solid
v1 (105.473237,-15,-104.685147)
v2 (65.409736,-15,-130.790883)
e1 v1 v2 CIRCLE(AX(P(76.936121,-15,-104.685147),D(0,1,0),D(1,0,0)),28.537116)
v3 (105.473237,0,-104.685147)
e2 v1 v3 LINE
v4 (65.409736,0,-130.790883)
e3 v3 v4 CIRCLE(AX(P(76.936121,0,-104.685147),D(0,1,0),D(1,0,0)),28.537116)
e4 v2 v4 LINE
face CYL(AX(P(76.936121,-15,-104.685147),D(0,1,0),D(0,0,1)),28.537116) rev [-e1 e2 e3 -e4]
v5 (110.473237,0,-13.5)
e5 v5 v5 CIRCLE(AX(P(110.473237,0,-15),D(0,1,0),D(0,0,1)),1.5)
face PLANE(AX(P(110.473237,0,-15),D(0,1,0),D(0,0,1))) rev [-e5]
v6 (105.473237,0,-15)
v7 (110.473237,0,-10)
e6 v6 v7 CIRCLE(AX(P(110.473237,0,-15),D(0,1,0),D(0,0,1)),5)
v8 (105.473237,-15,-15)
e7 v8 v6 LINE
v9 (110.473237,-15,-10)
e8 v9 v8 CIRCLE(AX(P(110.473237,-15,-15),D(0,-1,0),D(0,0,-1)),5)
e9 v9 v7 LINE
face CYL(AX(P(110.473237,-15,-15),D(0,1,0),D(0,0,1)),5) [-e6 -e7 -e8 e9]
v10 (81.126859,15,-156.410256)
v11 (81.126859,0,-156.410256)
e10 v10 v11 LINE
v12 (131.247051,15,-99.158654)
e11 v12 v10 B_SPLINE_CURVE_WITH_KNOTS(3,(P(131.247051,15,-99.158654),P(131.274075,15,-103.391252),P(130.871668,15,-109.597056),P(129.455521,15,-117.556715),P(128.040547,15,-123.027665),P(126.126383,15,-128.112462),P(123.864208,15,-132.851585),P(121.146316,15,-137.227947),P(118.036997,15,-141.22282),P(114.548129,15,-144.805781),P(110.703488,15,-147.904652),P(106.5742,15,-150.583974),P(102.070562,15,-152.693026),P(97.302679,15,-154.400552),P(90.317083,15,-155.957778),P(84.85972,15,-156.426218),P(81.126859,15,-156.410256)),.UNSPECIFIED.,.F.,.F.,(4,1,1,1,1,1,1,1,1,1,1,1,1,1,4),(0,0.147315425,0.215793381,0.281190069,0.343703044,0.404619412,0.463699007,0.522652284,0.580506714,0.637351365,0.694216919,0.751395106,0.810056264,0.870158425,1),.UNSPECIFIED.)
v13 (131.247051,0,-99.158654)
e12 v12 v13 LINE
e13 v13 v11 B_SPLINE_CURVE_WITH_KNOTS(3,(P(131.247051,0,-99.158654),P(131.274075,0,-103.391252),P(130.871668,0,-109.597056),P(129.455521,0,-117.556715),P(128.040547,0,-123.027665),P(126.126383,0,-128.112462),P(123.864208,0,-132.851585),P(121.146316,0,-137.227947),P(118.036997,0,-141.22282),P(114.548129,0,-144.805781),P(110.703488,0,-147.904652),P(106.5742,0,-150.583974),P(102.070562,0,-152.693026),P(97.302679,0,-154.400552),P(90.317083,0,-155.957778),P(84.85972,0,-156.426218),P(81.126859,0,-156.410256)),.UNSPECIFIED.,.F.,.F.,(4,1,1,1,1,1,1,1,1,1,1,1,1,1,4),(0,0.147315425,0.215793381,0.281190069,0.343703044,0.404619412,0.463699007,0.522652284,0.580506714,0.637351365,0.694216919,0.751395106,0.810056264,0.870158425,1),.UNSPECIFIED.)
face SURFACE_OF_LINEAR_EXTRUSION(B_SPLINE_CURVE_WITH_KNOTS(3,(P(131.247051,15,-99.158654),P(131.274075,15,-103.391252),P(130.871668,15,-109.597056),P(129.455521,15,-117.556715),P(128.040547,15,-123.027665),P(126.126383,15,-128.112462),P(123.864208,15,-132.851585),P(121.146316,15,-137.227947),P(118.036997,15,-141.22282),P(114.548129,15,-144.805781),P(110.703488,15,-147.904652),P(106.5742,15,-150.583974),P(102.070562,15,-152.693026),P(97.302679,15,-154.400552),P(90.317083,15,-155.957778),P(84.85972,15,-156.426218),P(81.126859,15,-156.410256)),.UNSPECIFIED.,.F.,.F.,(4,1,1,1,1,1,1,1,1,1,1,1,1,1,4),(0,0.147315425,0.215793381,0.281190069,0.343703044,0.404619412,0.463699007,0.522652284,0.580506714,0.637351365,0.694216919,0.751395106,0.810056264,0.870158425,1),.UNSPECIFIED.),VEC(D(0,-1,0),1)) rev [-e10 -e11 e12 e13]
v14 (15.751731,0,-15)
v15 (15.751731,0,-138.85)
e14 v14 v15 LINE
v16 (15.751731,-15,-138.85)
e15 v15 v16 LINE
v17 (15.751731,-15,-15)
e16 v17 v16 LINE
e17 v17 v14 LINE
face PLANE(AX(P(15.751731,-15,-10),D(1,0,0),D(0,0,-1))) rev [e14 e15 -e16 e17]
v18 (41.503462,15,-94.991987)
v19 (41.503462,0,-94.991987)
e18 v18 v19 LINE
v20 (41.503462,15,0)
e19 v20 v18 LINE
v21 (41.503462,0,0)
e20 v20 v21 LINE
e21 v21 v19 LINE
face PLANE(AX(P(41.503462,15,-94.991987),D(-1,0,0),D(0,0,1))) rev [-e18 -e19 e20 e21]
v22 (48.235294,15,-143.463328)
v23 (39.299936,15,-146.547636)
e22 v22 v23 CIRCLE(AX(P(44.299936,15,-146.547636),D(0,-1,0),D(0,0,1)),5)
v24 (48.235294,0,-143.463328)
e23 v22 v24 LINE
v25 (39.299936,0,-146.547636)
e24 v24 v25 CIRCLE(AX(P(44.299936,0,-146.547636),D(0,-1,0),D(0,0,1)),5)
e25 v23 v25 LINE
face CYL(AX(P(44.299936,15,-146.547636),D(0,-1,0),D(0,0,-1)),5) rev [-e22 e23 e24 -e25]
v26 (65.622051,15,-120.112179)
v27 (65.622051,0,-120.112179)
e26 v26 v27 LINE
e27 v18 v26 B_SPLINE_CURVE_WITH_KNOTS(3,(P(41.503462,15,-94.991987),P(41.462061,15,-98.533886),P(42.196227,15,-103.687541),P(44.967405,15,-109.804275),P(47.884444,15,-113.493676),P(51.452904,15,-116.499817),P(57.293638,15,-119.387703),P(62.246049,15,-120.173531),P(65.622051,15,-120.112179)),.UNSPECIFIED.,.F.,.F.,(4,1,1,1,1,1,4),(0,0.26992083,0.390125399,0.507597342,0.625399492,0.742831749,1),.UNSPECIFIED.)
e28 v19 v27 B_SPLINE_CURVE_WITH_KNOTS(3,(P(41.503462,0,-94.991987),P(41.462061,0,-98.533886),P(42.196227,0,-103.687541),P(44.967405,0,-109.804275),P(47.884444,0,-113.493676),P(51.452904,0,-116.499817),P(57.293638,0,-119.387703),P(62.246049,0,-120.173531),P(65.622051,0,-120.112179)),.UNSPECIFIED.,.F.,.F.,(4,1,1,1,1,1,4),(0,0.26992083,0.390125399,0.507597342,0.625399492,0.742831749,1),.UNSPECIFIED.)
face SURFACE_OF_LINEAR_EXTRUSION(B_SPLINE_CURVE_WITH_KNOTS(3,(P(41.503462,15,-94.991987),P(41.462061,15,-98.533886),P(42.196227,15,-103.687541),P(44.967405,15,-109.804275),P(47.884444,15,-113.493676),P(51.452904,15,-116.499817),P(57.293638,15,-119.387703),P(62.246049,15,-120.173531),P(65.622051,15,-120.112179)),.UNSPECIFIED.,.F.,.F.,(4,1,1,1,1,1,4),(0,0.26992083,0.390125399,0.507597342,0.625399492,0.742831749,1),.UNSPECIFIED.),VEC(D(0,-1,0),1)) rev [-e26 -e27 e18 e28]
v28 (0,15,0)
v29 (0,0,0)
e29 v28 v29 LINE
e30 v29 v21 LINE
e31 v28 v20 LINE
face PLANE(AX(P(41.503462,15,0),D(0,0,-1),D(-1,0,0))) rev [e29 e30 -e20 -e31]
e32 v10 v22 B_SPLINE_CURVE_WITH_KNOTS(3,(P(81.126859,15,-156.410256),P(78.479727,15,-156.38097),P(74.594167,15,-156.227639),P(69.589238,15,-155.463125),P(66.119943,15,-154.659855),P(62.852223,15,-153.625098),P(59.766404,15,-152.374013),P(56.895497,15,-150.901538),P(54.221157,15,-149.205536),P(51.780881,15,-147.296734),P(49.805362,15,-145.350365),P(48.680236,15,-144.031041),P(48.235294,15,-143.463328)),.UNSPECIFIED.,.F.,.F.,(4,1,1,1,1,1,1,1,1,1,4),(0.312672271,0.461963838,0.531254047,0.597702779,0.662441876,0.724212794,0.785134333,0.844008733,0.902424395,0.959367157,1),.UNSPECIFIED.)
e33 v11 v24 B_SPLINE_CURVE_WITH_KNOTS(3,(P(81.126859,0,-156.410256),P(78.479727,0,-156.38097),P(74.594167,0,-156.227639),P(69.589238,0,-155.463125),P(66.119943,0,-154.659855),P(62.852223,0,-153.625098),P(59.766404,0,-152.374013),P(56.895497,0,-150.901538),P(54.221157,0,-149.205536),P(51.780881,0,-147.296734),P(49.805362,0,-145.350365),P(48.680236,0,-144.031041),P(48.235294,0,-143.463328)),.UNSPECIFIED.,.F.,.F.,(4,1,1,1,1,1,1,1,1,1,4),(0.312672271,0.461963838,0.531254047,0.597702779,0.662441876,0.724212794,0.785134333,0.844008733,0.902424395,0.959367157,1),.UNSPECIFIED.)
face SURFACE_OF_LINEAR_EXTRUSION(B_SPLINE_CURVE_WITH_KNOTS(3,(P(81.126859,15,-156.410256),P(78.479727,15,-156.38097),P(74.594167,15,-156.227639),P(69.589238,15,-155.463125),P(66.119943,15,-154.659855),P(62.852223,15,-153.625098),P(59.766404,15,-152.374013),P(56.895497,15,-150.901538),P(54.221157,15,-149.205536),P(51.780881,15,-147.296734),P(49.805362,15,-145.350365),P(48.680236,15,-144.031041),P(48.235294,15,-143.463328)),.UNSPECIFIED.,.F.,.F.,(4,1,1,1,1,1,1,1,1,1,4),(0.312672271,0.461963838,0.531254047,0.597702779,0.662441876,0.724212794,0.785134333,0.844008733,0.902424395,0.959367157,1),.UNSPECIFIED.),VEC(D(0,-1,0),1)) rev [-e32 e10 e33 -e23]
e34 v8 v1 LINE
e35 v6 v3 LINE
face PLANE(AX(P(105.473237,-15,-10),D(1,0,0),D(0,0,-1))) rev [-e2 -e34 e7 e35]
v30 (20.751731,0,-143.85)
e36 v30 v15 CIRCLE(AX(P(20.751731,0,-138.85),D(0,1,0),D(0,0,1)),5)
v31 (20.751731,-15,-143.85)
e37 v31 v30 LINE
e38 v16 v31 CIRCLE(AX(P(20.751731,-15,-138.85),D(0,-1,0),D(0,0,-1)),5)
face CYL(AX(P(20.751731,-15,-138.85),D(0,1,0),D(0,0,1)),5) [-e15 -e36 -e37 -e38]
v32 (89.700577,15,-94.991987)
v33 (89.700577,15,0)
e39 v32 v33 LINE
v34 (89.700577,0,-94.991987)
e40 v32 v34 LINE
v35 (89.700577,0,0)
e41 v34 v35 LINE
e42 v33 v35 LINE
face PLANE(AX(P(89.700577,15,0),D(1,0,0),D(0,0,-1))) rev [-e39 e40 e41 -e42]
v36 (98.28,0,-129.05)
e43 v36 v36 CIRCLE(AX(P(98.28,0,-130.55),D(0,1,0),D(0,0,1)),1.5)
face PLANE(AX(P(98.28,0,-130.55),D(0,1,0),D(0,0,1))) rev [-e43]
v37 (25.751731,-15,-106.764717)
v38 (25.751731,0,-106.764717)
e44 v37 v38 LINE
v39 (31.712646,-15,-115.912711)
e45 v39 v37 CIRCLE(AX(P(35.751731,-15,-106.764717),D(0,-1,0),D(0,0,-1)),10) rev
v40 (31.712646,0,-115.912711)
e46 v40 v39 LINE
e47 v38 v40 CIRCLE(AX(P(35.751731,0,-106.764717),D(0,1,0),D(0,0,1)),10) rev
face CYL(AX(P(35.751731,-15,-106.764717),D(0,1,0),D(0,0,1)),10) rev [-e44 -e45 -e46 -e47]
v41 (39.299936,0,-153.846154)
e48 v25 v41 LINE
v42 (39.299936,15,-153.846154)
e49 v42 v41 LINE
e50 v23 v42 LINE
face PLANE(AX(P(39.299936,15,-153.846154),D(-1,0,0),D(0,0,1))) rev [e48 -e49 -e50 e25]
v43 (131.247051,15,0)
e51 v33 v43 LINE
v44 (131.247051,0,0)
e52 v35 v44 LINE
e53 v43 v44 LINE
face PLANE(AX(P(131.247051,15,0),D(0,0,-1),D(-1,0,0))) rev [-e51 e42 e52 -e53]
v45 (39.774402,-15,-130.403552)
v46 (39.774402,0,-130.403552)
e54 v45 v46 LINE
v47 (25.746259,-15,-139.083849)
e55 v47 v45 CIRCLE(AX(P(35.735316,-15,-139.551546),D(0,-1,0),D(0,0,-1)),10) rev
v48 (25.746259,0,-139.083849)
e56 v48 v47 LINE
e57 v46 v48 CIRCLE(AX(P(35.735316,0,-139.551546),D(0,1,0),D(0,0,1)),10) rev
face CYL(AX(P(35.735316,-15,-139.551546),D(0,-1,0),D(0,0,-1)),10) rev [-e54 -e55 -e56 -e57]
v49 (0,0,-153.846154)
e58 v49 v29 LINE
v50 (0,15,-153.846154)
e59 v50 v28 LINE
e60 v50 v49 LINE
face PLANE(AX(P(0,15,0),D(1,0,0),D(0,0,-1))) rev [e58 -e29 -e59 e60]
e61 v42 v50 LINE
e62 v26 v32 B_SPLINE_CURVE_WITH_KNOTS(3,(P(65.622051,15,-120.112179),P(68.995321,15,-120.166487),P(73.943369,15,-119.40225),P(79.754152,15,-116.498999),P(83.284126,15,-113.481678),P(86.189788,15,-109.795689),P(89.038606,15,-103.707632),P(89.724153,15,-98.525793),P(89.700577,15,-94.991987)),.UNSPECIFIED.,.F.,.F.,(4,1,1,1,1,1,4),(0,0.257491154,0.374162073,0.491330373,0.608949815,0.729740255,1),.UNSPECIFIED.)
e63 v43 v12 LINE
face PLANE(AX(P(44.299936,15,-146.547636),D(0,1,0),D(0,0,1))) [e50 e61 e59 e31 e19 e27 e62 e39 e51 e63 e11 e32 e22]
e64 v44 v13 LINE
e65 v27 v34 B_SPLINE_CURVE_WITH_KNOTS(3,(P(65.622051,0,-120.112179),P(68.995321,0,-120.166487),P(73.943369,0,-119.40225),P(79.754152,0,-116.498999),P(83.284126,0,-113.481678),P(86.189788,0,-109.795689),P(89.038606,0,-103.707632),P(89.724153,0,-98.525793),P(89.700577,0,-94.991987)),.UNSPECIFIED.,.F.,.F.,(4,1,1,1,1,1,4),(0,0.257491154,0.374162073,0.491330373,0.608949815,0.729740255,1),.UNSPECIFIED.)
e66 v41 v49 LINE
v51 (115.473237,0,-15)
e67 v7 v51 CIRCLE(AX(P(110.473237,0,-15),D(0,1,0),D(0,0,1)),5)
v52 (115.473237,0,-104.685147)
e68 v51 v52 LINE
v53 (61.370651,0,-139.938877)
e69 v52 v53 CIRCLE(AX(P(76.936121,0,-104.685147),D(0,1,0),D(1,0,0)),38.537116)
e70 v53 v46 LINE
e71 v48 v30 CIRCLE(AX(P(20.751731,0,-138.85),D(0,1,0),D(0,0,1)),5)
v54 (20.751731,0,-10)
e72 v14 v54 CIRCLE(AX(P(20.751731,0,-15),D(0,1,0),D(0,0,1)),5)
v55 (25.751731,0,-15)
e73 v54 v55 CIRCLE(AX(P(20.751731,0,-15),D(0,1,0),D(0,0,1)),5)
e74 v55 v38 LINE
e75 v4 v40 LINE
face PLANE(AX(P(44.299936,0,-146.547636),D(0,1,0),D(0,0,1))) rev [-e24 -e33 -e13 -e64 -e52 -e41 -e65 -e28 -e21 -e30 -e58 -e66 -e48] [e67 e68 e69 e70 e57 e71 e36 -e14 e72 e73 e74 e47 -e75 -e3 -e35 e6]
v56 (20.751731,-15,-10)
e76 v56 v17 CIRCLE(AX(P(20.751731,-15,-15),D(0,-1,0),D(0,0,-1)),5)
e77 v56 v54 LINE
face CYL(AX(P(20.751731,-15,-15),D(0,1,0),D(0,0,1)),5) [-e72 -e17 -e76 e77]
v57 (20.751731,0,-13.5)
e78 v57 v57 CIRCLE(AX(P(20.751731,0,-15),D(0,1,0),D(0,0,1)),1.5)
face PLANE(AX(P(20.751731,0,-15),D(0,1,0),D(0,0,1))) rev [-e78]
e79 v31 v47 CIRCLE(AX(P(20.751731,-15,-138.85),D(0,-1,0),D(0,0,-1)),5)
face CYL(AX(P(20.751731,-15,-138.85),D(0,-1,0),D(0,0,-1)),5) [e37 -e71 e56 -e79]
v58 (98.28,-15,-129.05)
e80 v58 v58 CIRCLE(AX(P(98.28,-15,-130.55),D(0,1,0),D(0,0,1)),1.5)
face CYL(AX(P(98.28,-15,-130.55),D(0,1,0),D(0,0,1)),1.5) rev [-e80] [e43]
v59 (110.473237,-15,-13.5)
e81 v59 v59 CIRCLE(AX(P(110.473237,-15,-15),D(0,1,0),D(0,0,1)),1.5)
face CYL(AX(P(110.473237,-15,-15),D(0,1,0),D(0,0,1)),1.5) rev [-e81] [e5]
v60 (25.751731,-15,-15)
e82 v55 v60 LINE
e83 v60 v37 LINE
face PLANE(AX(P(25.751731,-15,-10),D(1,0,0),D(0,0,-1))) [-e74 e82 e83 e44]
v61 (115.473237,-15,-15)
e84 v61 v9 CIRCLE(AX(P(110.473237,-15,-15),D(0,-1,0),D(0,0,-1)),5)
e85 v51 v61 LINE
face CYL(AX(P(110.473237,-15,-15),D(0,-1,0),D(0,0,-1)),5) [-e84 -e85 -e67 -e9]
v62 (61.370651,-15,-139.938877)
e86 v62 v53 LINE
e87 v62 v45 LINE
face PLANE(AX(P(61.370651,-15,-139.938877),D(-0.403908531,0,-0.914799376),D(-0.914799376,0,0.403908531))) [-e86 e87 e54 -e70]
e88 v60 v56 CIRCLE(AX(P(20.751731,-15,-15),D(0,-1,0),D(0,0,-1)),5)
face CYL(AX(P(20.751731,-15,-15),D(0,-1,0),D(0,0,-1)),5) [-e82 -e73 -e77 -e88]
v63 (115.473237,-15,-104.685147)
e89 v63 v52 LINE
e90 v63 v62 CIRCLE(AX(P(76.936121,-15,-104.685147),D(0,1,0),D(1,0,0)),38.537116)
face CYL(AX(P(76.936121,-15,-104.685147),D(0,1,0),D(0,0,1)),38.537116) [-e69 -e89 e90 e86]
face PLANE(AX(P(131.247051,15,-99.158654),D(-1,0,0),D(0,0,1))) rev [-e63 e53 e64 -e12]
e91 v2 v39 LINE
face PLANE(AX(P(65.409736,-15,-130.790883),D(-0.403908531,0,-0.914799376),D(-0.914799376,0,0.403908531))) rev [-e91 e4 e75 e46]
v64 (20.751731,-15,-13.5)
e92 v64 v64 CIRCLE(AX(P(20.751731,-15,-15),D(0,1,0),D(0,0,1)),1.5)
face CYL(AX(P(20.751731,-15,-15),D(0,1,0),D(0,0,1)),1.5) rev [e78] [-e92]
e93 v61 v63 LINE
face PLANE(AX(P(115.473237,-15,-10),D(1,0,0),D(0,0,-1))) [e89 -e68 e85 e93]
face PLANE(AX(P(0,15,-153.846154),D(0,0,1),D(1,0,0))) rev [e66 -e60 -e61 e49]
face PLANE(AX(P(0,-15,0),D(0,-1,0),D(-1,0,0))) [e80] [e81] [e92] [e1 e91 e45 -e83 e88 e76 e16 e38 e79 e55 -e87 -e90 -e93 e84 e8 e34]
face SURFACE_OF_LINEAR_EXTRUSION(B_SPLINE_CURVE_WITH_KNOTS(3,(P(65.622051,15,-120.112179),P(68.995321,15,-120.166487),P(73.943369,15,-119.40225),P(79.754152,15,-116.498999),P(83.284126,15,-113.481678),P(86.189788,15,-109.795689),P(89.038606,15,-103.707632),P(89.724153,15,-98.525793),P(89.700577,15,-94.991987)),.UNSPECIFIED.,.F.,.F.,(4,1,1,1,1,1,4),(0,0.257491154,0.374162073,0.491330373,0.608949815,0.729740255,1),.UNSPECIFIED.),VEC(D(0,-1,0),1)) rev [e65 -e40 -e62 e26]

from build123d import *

# Parameters (mm, degrees)
EXTRUDE_N_DEPTH        = 15
EXTRUDE_START          = -15
EXTRUDE_1247_DEPTH     = 15
FILLET_1323_R          = 5
FILLET_1704_R          = 10
SKETCH_1866_R          = 1.5
CUT_EXTRUDE_1874_DEPTH = 205.73302307


# Read off the part's stored shape, not the designer's step: Крепёж подсветки
with BuildPart() as part:
    # Эскиз n → n (new body)
    with BuildSketch(Plane(origin=(0, 0, 0), x_dir=(1, 0, 0), z_dir=(0, 1, 0))):
        with BuildLine():
            Line((0, 153.846153846), (39.299935897, 153.846153846))
            Line((39.299935897, 153.846153846), (39.299935897, 146.547635651))
            ThreePointArc((39.299935897, 146.547635651), (42.668493546, 141.821284431), (48.235294238, 143.463327831))
            add(Edge.make_bspline(
                [(48.235294238, 143.463327831), (48.680235544, 144.031041426), (49.805362072, 145.350365147), (51.780881441, 147.296733708), (54.221156894, 149.205536006), (56.895496579, 150.901537566), (59.76640372, 152.374012934), (62.852222566, 153.625097643), (66.119942525, 154.659854718), (69.589237805, 155.463125454), (74.594167261, 156.227638993), (78.47972692, 156.380969617), (81.126858974, 156.41025641)],
                knots=[0.312672271, 0.312672271, 0.312672271, 0.312672271, 0.353305114, 0.410247876, 0.468663539, 0.527537938, 0.588459477, 0.650230395, 0.714969493, 0.781418224, 0.850708434, 1, 1, 1, 1], degree=3))
            add(Edge.make_bspline(
                [(81.126858974, 156.41025641), (84.859720001, 156.426218167), (90.317082636, 155.957777721), (97.302679405, 154.400552389), (102.070561998, 152.693026297), (106.574200345, 150.583974492), (110.703488298, 147.904651559), (114.548128603, 144.805781264), (118.036996775, 141.222819891), (121.14631588, 137.227946624), (123.864208469, 132.851585446), (126.126383474, 128.112461575), (128.040546504, 123.027665479), (129.455521339, 117.556714971), (130.87166816, 109.597055945), (131.274075332, 103.391251973), (131.247051282, 99.158653846)],
                knots=[0, 0, 0, 0, 0.129841575, 0.189943736, 0.248604894, 0.305783081, 0.362648635, 0.419493286, 0.477347716, 0.536300993, 0.595380588, 0.656296956, 0.718809931, 0.784206619, 0.852684575, 1, 1, 1, 1], degree=3))
            Line((131.247051282, 99.158653846), (131.247051282, 0))
            Line((131.247051282, 0), (89.700576923, 0))
            Line((89.700576923, 0), (89.700576923, 94.991987179))
            add(Edge.make_bspline(
                [(89.700576923, 94.991987179), (89.724152638, 98.525793473), (89.038605734, 103.707632052), (86.189788042, 109.795689468), (83.284125509, 113.481677505), (79.754151619, 116.49899904), (73.94336902, 119.402249568), (68.995321139, 120.166486998), (65.622051282, 120.112179487)],
                knots=[0, 0, 0, 0, 0.270259745, 0.391050185, 0.508669627, 0.625837927, 0.742508846, 1, 1, 1, 1], degree=3))
            add(Edge.make_bspline(
                [(65.622051282, 120.112179487), (62.246048707, 120.173531263), (57.293638347, 119.387703313), (51.452904124, 116.499817419), (47.884444323, 113.49367552), (44.967404733, 109.804274849), (42.196227012, 103.687541079), (41.462060906, 98.533886415), (41.503461538, 94.991987179)],
                knots=[0, 0, 0, 0, 0.257168251, 0.374600508, 0.492402658, 0.609874601, 0.73007917, 1, 1, 1, 1], degree=3))
            Line((41.503461538, 94.991987179), (41.503461538, 0))
            Line((41.503461538, 0), (0, 0))
            Line((0, 0), (0, 153.846153846))
        make_face()
    extrude(amount=EXTRUDE_N_DEPTH)

    # Extrude 1247 outline → Extrude 1247 (add)
    with BuildSketch(Plane(origin=(0, 0, 0), x_dir=(1, 0, 0), z_dir=(0, 1, 0)).offset(EXTRUDE_START)):
        with BuildLine():
            Line((15.751731, 10), (25.751731, 10))
            Line((25.751731, 10), (25.751731, 113.28080684))
            Line((25.751731, 113.28080684), (65.409736151, 130.790882853))
            ThreePointArc((65.409736151, 130.790882853), (92.515549907, 128.594316344), (105.473237, 104.685146786))
            Line((105.473237, 104.685146786), (105.473237, 10))
            Line((105.473237, 10), (115.473237, 10))
            Line((115.473237, 10), (115.473237, 104.685146786))
            ThreePointArc((115.473237, 104.685146786), (97.974906411, 136.97258744), (61.370650839, 139.938876614))
            Line((61.370650839, 139.938876614), (25.751731, 124.212165411))
            Line((25.751731, 124.212165411), (25.751731, 143.85))
            Line((25.751731, 143.85), (15.751731, 143.85))
            Line((15.751731, 143.85), (15.751731, 10))
        make_face()
    extrude(amount=EXTRUDE_1247_DEPTH)

    # Fillet 1323
    fillet_1323_edges = [part.edges().sort_by_distance(p)[0] for p in [
        (25.751731, -7.5, -143.85),
        (15.751731, -7.5, -143.85),
        (15.751731, -7.5, -10),
        (25.751731, -7.5, -10),
        (105.473237, -7.5, -10),
        (115.473237, -7.5, -10),
    ]]
    fillet(fillet_1323_edges, radius=FILLET_1323_R - 0.0001)  # a hair under: the kernel refuses the full size

    # Fillet 1704
    fillet_1704_edges = [part.edges().sort_by_distance(p)[0] for p in [
        (25.751731, -7.5, -124.212165411),
        (25.751731, -7.5, -113.28080684),
    ]]
    fillet(fillet_1704_edges, radius=FILLET_1704_R)

    # Sketch 1866 → Cut-Extrude 1874 (cut, through all)
    with BuildSketch(Plane(origin=(0, 0, 0), x_dir=(1, 0, 0), z_dir=(0, 1, 0))):
        with Locations(Location((98.28, 130.55, 0), (0, 0, 270))):
            Circle(SKETCH_1866_R)
        with Locations(Location((20.751731, 15, 0), (0, 0, 270))):
            Circle(SKETCH_1866_R)
        with Locations(Location((110.473237, 15, 0), (0, 0, 270))):
            Circle(SKETCH_1866_R)
    extrude(amount=-CUT_EXTRUDE_1874_DEPTH, mode=Mode.SUBTRACT)


solid = part.part
